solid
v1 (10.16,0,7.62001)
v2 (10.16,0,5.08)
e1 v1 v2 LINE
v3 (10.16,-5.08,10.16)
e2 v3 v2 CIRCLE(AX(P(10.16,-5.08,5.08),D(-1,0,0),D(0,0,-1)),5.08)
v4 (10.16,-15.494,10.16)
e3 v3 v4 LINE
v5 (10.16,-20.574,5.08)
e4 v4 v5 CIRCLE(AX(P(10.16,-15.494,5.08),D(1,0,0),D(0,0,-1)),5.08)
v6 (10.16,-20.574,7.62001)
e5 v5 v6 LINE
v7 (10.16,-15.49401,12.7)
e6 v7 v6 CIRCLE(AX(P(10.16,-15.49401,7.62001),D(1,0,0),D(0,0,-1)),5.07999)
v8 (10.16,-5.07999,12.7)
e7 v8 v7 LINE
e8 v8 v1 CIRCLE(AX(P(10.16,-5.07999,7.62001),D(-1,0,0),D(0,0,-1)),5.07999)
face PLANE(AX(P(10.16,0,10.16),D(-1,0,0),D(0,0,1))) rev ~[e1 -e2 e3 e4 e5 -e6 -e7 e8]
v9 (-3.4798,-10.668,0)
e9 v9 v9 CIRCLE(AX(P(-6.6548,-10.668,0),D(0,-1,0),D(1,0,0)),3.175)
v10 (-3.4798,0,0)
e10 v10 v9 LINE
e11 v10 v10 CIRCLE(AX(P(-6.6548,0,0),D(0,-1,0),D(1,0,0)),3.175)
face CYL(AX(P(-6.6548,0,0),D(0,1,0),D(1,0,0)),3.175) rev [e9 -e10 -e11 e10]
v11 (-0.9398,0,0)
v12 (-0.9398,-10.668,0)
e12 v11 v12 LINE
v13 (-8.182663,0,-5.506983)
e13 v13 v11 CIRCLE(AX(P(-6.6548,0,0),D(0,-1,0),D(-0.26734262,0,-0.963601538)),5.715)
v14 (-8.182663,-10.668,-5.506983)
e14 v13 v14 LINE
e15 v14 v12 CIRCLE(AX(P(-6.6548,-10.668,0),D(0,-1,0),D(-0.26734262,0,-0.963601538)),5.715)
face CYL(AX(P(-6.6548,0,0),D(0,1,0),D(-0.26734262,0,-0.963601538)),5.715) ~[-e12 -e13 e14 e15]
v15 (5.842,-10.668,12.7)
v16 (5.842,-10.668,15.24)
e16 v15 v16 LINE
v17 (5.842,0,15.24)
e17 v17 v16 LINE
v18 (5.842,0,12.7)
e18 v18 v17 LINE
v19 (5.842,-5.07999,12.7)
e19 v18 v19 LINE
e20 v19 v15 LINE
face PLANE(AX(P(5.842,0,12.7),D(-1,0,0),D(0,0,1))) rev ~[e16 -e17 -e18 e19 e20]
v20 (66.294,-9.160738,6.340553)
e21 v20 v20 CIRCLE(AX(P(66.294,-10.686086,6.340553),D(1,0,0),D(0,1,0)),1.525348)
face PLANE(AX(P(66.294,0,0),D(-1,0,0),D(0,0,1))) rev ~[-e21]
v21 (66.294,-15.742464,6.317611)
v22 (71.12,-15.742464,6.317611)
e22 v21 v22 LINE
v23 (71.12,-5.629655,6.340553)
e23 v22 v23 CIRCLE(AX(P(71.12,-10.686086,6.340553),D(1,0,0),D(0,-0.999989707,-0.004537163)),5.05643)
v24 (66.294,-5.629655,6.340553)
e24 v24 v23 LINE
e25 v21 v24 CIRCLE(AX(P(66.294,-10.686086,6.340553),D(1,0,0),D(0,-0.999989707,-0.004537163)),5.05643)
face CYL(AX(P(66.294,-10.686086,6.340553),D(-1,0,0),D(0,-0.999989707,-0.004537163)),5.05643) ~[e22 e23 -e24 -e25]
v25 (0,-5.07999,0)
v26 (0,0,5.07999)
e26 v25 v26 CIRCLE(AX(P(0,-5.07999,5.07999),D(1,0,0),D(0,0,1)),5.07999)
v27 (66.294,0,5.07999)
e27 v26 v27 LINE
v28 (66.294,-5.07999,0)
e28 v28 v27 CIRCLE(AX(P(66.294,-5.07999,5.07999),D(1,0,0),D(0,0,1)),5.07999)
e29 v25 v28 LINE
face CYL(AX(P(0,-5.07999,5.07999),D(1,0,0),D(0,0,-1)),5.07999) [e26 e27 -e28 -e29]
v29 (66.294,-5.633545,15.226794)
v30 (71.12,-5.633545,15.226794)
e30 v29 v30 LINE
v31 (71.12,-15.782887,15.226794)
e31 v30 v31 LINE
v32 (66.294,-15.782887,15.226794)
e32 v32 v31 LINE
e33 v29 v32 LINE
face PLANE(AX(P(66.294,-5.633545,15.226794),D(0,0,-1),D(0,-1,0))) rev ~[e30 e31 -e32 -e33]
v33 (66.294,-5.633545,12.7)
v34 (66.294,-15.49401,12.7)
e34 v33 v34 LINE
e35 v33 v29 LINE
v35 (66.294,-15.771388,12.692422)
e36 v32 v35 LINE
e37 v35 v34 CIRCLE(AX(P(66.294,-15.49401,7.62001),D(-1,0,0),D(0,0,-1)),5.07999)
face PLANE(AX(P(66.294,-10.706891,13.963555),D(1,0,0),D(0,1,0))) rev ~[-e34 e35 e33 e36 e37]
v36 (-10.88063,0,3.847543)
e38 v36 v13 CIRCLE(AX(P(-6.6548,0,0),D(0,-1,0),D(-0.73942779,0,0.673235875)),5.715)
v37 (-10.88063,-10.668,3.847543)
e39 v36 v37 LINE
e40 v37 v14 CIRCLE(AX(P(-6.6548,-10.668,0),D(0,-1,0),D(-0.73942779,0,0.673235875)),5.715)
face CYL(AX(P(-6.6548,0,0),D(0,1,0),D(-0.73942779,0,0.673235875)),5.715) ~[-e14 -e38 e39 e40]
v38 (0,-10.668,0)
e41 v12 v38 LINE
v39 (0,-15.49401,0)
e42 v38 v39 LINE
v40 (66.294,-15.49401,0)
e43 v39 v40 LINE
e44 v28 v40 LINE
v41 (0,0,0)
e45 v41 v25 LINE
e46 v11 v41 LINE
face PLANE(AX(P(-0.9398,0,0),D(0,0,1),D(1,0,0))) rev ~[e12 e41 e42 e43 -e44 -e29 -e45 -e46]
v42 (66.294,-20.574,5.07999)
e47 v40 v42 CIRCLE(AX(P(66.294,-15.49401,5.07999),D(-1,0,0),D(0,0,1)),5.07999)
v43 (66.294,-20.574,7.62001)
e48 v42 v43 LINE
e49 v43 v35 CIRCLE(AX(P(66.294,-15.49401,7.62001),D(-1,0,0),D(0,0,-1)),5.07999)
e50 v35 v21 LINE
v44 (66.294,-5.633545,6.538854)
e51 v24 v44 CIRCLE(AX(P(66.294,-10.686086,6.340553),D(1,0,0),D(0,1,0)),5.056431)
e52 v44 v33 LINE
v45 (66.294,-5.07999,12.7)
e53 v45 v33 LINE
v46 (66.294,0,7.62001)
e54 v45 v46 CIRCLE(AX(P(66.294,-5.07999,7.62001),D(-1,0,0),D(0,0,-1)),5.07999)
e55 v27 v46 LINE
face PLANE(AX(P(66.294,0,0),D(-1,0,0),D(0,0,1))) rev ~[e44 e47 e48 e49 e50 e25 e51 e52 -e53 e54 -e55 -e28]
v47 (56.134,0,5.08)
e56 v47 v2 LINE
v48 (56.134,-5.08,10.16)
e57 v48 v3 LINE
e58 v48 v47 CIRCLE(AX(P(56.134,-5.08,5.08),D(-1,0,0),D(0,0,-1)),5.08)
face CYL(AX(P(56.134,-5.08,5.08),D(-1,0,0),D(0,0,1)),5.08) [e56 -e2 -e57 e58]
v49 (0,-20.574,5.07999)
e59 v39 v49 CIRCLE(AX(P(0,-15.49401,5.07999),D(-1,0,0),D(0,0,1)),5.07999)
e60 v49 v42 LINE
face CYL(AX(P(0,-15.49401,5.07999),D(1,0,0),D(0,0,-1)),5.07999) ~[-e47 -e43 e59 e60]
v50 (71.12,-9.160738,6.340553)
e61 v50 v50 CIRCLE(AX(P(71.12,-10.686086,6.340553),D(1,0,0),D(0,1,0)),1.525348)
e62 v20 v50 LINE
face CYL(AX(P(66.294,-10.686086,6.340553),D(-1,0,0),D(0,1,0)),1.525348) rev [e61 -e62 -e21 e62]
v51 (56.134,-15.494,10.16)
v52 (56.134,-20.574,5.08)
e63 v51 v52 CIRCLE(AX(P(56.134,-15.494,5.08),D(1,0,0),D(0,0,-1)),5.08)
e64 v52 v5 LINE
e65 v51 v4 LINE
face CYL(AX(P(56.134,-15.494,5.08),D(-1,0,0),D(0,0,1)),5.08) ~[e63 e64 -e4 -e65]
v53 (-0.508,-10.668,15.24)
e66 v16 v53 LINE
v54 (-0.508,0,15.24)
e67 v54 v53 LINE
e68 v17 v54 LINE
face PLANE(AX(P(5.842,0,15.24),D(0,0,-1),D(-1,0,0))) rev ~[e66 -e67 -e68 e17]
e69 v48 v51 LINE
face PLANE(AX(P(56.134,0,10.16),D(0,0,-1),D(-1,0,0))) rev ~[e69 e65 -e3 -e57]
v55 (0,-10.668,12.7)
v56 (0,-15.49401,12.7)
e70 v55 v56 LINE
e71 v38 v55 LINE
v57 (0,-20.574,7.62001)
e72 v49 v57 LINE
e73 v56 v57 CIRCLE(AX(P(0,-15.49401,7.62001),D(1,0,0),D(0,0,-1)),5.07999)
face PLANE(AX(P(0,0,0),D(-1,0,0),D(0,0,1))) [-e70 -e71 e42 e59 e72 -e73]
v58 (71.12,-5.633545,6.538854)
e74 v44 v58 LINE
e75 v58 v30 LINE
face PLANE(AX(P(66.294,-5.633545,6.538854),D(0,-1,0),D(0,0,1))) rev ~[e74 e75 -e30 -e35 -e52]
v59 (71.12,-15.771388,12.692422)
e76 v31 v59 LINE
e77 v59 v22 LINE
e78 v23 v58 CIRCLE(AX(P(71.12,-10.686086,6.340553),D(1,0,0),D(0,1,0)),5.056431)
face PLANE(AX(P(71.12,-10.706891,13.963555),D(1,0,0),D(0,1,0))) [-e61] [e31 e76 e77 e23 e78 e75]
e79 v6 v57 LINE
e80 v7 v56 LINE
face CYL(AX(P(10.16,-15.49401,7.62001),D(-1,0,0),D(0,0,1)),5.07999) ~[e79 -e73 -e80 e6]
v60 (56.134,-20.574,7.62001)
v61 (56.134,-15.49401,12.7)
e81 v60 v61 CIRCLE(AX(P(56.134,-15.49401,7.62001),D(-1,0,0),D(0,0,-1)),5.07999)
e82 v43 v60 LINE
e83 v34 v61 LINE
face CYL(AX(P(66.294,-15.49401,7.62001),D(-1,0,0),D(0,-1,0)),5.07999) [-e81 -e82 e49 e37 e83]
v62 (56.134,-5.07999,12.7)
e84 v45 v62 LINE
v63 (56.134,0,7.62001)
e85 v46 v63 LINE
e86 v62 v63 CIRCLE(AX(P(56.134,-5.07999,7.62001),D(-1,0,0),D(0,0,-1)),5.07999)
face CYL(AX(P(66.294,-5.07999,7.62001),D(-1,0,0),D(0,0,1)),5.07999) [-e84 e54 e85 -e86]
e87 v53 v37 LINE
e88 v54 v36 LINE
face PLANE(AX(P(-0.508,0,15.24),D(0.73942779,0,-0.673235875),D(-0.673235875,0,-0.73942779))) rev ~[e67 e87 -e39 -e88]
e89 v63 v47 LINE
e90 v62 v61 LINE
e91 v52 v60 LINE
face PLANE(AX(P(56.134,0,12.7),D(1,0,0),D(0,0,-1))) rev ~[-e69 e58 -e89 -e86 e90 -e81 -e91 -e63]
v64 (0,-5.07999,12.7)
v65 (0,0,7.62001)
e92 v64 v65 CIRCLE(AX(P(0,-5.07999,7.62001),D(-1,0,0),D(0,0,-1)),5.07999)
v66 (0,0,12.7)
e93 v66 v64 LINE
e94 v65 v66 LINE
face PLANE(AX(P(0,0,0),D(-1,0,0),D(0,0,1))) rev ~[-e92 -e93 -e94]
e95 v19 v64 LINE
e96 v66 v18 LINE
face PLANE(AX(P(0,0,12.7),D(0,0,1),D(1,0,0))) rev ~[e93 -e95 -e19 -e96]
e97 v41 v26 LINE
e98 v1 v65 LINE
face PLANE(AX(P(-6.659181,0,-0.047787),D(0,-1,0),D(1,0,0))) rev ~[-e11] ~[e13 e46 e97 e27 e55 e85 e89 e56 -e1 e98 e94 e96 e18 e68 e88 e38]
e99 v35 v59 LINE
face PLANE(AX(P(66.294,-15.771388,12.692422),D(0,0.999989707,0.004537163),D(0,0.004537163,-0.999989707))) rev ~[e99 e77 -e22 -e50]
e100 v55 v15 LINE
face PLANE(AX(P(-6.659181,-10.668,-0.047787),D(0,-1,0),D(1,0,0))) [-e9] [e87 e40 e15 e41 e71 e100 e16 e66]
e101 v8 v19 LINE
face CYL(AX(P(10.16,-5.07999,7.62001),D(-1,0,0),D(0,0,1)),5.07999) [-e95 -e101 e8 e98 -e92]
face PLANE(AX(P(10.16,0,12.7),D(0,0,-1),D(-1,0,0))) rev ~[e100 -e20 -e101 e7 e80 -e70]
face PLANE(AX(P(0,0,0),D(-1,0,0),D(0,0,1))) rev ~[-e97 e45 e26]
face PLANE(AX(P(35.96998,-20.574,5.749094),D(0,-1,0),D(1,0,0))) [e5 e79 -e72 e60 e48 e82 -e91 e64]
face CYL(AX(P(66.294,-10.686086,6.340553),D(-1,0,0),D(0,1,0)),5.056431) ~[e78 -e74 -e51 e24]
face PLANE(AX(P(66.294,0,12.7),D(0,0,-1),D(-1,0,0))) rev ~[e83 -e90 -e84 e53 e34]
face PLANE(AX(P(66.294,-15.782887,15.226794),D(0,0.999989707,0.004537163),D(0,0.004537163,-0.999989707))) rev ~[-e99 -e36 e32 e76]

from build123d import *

# Parameters (mm, degrees)
F0_W     = 5.842
F0_H     = 12.7
F1_DEPTH = 20.574
F2_R     = 5.08
F3_R     = 5.07999
F0_R     = 3.175
F4_DEPTH = 10.668
F5_R     = 1.5253482573
F6_DEPTH = 4.826


# Not quite as in the source:
# - a fillet or chamfer is up to 0.001 mm smaller than in the source, because OpenCascade refuses the exact size


with BuildPart() as f1:
    # F0 (on Front) → F1 (new body)
    with BuildSketch(Plane.XZ):
        Polygon((5.842, 12.7), (5.842, 0), (66.294, 0), (66.294, 12.7), (56.134, 12.7), (56.134, 10.16), (10.16, 10.16), (10.16, 12.7), align=None)
        with Locations((2.921, 6.35)):
            Rectangle(F0_W, F0_H)
    extrude(amount=F1_DEPTH)

    # F2
    f2_edges = [f1.edges().sort_by_distance(p)[0] for p in [
        (33.147, 0, 10.16),
        (33.147, -20.574, 10.16),
    ]]
    fillet(f2_edges, radius=F2_R)

    # F3 (radius 5.08 in the source; OpenCascade refuses exactly that, so slightly less here)
    f3_edges = [f1.edges().sort_by_distance(p)[0] for p in [
        (33.147, 0, 0),
        (61.214, 0, 12.7),
        (61.214, -20.574, 12.7),
        (5.08, 0, 12.7),
        (5.08, -20.574, 12.7),
        (33.147, -20.574, 0),
    ]]
    fillet(f3_edges, radius=F3_R)

    # F0 (on Front) → F4 (join)
    with BuildSketch(Plane.XZ):
        with BuildLine():
            ThreePointArc((-8.1826630726, -5.5069827884), (-3.1957909266, -4.5493385486), (-0.9398, 0))
            ThreePointArc((-0.9398, 0), (-4.5919612295, 5.3297205562), (-10.8806298187, 3.8475430269))
            ThreePointArc((-10.8806298187, 3.8475430269), (-12.1459778134, -1.5837270034), (-8.1826630726, -5.5069827884))
        make_face()
        with Locations((-6.6548, 0)):
            Circle(F0_R, mode=Mode.SUBTRACT)
        with BuildLine():
            Line((-0.9398, 0), (0, 0))
            Line((0, 0), (0, 12.7))
            Line((0, 12.7), (5.842, 12.7))
            Line((5.842, 12.7), (5.842, 15.24))
            Line((5.842, 15.24), (-0.508, 15.24))
            Line((-0.508, 15.24), (-10.8806298187, 3.8475430269))
            ThreePointArc((-10.8806298187, 3.8475430269), (-4.5919612295, 5.3297205562), (-0.9398, 0))
        make_face()
    extrude(amount=F4_DEPTH)

    # F5 (on face) → F6 (join)
    with BuildSketch(Plane.YZ.offset(66.294)):
        with BuildLine():
            Line((-15.49401, 12.7), (-5.6335453628, 12.7))
            Line((-5.6335453628, 12.7), (-5.6335453628, 15.2267941305))
            Line((-5.6335453628, 15.2267941305), (-14.7798256949, 15.2267941305))
            Line((-14.7798256949, 15.2267941305), (-15.7828871161, 15.2267941305))
            Line((-15.7828871161, 15.2267941305), (-15.7713881355, 12.6924216326))
            ThreePointArc((-15.7713881355, 12.6924216326), (-15.632750821, 12.6981050547), (-15.49401, 12.7))
        make_face()
        with BuildLine():
            ThreePointArc((-15.7424642816, 6.3176113686), (-10.7967240539, 11.3957731119), (-5.6335453628, 6.5388544493))
            Line((-5.6335453628, 6.5388544493), (-5.6335453628, 12.7))
            Line((-5.6335453628, 12.7), (-15.49401, 12.7))
            ThreePointArc((-15.49401, 12.7), (-15.632750821, 12.6981050547), (-15.7713881355, 12.6924216326))
            Line((-15.7713881355, 12.6924216326), (-15.7424642816, 6.3176113686))
        make_face()
        with BuildLine():
            ThreePointArc((-15.7424642816, 6.3176113686), (-10.6746149155, 1.2841357749), (-5.6296554142, 6.3405532201))
            ThreePointArc((-5.6296554142, 6.3405532201), (-5.6306279949, 6.4397229095), (-5.6335453628, 6.5388544493))
            ThreePointArc((-5.6335453628, 6.5388544493), (-10.7967240539, 11.3957731119), (-15.7424642816, 6.3176113686))
        make_face()
        with Locations((-10.6860858708, 6.3405532201)):
            Circle(F5_R, mode=Mode.SUBTRACT)
    extrude(amount=F6_DEPTH)


solid = f1.part
